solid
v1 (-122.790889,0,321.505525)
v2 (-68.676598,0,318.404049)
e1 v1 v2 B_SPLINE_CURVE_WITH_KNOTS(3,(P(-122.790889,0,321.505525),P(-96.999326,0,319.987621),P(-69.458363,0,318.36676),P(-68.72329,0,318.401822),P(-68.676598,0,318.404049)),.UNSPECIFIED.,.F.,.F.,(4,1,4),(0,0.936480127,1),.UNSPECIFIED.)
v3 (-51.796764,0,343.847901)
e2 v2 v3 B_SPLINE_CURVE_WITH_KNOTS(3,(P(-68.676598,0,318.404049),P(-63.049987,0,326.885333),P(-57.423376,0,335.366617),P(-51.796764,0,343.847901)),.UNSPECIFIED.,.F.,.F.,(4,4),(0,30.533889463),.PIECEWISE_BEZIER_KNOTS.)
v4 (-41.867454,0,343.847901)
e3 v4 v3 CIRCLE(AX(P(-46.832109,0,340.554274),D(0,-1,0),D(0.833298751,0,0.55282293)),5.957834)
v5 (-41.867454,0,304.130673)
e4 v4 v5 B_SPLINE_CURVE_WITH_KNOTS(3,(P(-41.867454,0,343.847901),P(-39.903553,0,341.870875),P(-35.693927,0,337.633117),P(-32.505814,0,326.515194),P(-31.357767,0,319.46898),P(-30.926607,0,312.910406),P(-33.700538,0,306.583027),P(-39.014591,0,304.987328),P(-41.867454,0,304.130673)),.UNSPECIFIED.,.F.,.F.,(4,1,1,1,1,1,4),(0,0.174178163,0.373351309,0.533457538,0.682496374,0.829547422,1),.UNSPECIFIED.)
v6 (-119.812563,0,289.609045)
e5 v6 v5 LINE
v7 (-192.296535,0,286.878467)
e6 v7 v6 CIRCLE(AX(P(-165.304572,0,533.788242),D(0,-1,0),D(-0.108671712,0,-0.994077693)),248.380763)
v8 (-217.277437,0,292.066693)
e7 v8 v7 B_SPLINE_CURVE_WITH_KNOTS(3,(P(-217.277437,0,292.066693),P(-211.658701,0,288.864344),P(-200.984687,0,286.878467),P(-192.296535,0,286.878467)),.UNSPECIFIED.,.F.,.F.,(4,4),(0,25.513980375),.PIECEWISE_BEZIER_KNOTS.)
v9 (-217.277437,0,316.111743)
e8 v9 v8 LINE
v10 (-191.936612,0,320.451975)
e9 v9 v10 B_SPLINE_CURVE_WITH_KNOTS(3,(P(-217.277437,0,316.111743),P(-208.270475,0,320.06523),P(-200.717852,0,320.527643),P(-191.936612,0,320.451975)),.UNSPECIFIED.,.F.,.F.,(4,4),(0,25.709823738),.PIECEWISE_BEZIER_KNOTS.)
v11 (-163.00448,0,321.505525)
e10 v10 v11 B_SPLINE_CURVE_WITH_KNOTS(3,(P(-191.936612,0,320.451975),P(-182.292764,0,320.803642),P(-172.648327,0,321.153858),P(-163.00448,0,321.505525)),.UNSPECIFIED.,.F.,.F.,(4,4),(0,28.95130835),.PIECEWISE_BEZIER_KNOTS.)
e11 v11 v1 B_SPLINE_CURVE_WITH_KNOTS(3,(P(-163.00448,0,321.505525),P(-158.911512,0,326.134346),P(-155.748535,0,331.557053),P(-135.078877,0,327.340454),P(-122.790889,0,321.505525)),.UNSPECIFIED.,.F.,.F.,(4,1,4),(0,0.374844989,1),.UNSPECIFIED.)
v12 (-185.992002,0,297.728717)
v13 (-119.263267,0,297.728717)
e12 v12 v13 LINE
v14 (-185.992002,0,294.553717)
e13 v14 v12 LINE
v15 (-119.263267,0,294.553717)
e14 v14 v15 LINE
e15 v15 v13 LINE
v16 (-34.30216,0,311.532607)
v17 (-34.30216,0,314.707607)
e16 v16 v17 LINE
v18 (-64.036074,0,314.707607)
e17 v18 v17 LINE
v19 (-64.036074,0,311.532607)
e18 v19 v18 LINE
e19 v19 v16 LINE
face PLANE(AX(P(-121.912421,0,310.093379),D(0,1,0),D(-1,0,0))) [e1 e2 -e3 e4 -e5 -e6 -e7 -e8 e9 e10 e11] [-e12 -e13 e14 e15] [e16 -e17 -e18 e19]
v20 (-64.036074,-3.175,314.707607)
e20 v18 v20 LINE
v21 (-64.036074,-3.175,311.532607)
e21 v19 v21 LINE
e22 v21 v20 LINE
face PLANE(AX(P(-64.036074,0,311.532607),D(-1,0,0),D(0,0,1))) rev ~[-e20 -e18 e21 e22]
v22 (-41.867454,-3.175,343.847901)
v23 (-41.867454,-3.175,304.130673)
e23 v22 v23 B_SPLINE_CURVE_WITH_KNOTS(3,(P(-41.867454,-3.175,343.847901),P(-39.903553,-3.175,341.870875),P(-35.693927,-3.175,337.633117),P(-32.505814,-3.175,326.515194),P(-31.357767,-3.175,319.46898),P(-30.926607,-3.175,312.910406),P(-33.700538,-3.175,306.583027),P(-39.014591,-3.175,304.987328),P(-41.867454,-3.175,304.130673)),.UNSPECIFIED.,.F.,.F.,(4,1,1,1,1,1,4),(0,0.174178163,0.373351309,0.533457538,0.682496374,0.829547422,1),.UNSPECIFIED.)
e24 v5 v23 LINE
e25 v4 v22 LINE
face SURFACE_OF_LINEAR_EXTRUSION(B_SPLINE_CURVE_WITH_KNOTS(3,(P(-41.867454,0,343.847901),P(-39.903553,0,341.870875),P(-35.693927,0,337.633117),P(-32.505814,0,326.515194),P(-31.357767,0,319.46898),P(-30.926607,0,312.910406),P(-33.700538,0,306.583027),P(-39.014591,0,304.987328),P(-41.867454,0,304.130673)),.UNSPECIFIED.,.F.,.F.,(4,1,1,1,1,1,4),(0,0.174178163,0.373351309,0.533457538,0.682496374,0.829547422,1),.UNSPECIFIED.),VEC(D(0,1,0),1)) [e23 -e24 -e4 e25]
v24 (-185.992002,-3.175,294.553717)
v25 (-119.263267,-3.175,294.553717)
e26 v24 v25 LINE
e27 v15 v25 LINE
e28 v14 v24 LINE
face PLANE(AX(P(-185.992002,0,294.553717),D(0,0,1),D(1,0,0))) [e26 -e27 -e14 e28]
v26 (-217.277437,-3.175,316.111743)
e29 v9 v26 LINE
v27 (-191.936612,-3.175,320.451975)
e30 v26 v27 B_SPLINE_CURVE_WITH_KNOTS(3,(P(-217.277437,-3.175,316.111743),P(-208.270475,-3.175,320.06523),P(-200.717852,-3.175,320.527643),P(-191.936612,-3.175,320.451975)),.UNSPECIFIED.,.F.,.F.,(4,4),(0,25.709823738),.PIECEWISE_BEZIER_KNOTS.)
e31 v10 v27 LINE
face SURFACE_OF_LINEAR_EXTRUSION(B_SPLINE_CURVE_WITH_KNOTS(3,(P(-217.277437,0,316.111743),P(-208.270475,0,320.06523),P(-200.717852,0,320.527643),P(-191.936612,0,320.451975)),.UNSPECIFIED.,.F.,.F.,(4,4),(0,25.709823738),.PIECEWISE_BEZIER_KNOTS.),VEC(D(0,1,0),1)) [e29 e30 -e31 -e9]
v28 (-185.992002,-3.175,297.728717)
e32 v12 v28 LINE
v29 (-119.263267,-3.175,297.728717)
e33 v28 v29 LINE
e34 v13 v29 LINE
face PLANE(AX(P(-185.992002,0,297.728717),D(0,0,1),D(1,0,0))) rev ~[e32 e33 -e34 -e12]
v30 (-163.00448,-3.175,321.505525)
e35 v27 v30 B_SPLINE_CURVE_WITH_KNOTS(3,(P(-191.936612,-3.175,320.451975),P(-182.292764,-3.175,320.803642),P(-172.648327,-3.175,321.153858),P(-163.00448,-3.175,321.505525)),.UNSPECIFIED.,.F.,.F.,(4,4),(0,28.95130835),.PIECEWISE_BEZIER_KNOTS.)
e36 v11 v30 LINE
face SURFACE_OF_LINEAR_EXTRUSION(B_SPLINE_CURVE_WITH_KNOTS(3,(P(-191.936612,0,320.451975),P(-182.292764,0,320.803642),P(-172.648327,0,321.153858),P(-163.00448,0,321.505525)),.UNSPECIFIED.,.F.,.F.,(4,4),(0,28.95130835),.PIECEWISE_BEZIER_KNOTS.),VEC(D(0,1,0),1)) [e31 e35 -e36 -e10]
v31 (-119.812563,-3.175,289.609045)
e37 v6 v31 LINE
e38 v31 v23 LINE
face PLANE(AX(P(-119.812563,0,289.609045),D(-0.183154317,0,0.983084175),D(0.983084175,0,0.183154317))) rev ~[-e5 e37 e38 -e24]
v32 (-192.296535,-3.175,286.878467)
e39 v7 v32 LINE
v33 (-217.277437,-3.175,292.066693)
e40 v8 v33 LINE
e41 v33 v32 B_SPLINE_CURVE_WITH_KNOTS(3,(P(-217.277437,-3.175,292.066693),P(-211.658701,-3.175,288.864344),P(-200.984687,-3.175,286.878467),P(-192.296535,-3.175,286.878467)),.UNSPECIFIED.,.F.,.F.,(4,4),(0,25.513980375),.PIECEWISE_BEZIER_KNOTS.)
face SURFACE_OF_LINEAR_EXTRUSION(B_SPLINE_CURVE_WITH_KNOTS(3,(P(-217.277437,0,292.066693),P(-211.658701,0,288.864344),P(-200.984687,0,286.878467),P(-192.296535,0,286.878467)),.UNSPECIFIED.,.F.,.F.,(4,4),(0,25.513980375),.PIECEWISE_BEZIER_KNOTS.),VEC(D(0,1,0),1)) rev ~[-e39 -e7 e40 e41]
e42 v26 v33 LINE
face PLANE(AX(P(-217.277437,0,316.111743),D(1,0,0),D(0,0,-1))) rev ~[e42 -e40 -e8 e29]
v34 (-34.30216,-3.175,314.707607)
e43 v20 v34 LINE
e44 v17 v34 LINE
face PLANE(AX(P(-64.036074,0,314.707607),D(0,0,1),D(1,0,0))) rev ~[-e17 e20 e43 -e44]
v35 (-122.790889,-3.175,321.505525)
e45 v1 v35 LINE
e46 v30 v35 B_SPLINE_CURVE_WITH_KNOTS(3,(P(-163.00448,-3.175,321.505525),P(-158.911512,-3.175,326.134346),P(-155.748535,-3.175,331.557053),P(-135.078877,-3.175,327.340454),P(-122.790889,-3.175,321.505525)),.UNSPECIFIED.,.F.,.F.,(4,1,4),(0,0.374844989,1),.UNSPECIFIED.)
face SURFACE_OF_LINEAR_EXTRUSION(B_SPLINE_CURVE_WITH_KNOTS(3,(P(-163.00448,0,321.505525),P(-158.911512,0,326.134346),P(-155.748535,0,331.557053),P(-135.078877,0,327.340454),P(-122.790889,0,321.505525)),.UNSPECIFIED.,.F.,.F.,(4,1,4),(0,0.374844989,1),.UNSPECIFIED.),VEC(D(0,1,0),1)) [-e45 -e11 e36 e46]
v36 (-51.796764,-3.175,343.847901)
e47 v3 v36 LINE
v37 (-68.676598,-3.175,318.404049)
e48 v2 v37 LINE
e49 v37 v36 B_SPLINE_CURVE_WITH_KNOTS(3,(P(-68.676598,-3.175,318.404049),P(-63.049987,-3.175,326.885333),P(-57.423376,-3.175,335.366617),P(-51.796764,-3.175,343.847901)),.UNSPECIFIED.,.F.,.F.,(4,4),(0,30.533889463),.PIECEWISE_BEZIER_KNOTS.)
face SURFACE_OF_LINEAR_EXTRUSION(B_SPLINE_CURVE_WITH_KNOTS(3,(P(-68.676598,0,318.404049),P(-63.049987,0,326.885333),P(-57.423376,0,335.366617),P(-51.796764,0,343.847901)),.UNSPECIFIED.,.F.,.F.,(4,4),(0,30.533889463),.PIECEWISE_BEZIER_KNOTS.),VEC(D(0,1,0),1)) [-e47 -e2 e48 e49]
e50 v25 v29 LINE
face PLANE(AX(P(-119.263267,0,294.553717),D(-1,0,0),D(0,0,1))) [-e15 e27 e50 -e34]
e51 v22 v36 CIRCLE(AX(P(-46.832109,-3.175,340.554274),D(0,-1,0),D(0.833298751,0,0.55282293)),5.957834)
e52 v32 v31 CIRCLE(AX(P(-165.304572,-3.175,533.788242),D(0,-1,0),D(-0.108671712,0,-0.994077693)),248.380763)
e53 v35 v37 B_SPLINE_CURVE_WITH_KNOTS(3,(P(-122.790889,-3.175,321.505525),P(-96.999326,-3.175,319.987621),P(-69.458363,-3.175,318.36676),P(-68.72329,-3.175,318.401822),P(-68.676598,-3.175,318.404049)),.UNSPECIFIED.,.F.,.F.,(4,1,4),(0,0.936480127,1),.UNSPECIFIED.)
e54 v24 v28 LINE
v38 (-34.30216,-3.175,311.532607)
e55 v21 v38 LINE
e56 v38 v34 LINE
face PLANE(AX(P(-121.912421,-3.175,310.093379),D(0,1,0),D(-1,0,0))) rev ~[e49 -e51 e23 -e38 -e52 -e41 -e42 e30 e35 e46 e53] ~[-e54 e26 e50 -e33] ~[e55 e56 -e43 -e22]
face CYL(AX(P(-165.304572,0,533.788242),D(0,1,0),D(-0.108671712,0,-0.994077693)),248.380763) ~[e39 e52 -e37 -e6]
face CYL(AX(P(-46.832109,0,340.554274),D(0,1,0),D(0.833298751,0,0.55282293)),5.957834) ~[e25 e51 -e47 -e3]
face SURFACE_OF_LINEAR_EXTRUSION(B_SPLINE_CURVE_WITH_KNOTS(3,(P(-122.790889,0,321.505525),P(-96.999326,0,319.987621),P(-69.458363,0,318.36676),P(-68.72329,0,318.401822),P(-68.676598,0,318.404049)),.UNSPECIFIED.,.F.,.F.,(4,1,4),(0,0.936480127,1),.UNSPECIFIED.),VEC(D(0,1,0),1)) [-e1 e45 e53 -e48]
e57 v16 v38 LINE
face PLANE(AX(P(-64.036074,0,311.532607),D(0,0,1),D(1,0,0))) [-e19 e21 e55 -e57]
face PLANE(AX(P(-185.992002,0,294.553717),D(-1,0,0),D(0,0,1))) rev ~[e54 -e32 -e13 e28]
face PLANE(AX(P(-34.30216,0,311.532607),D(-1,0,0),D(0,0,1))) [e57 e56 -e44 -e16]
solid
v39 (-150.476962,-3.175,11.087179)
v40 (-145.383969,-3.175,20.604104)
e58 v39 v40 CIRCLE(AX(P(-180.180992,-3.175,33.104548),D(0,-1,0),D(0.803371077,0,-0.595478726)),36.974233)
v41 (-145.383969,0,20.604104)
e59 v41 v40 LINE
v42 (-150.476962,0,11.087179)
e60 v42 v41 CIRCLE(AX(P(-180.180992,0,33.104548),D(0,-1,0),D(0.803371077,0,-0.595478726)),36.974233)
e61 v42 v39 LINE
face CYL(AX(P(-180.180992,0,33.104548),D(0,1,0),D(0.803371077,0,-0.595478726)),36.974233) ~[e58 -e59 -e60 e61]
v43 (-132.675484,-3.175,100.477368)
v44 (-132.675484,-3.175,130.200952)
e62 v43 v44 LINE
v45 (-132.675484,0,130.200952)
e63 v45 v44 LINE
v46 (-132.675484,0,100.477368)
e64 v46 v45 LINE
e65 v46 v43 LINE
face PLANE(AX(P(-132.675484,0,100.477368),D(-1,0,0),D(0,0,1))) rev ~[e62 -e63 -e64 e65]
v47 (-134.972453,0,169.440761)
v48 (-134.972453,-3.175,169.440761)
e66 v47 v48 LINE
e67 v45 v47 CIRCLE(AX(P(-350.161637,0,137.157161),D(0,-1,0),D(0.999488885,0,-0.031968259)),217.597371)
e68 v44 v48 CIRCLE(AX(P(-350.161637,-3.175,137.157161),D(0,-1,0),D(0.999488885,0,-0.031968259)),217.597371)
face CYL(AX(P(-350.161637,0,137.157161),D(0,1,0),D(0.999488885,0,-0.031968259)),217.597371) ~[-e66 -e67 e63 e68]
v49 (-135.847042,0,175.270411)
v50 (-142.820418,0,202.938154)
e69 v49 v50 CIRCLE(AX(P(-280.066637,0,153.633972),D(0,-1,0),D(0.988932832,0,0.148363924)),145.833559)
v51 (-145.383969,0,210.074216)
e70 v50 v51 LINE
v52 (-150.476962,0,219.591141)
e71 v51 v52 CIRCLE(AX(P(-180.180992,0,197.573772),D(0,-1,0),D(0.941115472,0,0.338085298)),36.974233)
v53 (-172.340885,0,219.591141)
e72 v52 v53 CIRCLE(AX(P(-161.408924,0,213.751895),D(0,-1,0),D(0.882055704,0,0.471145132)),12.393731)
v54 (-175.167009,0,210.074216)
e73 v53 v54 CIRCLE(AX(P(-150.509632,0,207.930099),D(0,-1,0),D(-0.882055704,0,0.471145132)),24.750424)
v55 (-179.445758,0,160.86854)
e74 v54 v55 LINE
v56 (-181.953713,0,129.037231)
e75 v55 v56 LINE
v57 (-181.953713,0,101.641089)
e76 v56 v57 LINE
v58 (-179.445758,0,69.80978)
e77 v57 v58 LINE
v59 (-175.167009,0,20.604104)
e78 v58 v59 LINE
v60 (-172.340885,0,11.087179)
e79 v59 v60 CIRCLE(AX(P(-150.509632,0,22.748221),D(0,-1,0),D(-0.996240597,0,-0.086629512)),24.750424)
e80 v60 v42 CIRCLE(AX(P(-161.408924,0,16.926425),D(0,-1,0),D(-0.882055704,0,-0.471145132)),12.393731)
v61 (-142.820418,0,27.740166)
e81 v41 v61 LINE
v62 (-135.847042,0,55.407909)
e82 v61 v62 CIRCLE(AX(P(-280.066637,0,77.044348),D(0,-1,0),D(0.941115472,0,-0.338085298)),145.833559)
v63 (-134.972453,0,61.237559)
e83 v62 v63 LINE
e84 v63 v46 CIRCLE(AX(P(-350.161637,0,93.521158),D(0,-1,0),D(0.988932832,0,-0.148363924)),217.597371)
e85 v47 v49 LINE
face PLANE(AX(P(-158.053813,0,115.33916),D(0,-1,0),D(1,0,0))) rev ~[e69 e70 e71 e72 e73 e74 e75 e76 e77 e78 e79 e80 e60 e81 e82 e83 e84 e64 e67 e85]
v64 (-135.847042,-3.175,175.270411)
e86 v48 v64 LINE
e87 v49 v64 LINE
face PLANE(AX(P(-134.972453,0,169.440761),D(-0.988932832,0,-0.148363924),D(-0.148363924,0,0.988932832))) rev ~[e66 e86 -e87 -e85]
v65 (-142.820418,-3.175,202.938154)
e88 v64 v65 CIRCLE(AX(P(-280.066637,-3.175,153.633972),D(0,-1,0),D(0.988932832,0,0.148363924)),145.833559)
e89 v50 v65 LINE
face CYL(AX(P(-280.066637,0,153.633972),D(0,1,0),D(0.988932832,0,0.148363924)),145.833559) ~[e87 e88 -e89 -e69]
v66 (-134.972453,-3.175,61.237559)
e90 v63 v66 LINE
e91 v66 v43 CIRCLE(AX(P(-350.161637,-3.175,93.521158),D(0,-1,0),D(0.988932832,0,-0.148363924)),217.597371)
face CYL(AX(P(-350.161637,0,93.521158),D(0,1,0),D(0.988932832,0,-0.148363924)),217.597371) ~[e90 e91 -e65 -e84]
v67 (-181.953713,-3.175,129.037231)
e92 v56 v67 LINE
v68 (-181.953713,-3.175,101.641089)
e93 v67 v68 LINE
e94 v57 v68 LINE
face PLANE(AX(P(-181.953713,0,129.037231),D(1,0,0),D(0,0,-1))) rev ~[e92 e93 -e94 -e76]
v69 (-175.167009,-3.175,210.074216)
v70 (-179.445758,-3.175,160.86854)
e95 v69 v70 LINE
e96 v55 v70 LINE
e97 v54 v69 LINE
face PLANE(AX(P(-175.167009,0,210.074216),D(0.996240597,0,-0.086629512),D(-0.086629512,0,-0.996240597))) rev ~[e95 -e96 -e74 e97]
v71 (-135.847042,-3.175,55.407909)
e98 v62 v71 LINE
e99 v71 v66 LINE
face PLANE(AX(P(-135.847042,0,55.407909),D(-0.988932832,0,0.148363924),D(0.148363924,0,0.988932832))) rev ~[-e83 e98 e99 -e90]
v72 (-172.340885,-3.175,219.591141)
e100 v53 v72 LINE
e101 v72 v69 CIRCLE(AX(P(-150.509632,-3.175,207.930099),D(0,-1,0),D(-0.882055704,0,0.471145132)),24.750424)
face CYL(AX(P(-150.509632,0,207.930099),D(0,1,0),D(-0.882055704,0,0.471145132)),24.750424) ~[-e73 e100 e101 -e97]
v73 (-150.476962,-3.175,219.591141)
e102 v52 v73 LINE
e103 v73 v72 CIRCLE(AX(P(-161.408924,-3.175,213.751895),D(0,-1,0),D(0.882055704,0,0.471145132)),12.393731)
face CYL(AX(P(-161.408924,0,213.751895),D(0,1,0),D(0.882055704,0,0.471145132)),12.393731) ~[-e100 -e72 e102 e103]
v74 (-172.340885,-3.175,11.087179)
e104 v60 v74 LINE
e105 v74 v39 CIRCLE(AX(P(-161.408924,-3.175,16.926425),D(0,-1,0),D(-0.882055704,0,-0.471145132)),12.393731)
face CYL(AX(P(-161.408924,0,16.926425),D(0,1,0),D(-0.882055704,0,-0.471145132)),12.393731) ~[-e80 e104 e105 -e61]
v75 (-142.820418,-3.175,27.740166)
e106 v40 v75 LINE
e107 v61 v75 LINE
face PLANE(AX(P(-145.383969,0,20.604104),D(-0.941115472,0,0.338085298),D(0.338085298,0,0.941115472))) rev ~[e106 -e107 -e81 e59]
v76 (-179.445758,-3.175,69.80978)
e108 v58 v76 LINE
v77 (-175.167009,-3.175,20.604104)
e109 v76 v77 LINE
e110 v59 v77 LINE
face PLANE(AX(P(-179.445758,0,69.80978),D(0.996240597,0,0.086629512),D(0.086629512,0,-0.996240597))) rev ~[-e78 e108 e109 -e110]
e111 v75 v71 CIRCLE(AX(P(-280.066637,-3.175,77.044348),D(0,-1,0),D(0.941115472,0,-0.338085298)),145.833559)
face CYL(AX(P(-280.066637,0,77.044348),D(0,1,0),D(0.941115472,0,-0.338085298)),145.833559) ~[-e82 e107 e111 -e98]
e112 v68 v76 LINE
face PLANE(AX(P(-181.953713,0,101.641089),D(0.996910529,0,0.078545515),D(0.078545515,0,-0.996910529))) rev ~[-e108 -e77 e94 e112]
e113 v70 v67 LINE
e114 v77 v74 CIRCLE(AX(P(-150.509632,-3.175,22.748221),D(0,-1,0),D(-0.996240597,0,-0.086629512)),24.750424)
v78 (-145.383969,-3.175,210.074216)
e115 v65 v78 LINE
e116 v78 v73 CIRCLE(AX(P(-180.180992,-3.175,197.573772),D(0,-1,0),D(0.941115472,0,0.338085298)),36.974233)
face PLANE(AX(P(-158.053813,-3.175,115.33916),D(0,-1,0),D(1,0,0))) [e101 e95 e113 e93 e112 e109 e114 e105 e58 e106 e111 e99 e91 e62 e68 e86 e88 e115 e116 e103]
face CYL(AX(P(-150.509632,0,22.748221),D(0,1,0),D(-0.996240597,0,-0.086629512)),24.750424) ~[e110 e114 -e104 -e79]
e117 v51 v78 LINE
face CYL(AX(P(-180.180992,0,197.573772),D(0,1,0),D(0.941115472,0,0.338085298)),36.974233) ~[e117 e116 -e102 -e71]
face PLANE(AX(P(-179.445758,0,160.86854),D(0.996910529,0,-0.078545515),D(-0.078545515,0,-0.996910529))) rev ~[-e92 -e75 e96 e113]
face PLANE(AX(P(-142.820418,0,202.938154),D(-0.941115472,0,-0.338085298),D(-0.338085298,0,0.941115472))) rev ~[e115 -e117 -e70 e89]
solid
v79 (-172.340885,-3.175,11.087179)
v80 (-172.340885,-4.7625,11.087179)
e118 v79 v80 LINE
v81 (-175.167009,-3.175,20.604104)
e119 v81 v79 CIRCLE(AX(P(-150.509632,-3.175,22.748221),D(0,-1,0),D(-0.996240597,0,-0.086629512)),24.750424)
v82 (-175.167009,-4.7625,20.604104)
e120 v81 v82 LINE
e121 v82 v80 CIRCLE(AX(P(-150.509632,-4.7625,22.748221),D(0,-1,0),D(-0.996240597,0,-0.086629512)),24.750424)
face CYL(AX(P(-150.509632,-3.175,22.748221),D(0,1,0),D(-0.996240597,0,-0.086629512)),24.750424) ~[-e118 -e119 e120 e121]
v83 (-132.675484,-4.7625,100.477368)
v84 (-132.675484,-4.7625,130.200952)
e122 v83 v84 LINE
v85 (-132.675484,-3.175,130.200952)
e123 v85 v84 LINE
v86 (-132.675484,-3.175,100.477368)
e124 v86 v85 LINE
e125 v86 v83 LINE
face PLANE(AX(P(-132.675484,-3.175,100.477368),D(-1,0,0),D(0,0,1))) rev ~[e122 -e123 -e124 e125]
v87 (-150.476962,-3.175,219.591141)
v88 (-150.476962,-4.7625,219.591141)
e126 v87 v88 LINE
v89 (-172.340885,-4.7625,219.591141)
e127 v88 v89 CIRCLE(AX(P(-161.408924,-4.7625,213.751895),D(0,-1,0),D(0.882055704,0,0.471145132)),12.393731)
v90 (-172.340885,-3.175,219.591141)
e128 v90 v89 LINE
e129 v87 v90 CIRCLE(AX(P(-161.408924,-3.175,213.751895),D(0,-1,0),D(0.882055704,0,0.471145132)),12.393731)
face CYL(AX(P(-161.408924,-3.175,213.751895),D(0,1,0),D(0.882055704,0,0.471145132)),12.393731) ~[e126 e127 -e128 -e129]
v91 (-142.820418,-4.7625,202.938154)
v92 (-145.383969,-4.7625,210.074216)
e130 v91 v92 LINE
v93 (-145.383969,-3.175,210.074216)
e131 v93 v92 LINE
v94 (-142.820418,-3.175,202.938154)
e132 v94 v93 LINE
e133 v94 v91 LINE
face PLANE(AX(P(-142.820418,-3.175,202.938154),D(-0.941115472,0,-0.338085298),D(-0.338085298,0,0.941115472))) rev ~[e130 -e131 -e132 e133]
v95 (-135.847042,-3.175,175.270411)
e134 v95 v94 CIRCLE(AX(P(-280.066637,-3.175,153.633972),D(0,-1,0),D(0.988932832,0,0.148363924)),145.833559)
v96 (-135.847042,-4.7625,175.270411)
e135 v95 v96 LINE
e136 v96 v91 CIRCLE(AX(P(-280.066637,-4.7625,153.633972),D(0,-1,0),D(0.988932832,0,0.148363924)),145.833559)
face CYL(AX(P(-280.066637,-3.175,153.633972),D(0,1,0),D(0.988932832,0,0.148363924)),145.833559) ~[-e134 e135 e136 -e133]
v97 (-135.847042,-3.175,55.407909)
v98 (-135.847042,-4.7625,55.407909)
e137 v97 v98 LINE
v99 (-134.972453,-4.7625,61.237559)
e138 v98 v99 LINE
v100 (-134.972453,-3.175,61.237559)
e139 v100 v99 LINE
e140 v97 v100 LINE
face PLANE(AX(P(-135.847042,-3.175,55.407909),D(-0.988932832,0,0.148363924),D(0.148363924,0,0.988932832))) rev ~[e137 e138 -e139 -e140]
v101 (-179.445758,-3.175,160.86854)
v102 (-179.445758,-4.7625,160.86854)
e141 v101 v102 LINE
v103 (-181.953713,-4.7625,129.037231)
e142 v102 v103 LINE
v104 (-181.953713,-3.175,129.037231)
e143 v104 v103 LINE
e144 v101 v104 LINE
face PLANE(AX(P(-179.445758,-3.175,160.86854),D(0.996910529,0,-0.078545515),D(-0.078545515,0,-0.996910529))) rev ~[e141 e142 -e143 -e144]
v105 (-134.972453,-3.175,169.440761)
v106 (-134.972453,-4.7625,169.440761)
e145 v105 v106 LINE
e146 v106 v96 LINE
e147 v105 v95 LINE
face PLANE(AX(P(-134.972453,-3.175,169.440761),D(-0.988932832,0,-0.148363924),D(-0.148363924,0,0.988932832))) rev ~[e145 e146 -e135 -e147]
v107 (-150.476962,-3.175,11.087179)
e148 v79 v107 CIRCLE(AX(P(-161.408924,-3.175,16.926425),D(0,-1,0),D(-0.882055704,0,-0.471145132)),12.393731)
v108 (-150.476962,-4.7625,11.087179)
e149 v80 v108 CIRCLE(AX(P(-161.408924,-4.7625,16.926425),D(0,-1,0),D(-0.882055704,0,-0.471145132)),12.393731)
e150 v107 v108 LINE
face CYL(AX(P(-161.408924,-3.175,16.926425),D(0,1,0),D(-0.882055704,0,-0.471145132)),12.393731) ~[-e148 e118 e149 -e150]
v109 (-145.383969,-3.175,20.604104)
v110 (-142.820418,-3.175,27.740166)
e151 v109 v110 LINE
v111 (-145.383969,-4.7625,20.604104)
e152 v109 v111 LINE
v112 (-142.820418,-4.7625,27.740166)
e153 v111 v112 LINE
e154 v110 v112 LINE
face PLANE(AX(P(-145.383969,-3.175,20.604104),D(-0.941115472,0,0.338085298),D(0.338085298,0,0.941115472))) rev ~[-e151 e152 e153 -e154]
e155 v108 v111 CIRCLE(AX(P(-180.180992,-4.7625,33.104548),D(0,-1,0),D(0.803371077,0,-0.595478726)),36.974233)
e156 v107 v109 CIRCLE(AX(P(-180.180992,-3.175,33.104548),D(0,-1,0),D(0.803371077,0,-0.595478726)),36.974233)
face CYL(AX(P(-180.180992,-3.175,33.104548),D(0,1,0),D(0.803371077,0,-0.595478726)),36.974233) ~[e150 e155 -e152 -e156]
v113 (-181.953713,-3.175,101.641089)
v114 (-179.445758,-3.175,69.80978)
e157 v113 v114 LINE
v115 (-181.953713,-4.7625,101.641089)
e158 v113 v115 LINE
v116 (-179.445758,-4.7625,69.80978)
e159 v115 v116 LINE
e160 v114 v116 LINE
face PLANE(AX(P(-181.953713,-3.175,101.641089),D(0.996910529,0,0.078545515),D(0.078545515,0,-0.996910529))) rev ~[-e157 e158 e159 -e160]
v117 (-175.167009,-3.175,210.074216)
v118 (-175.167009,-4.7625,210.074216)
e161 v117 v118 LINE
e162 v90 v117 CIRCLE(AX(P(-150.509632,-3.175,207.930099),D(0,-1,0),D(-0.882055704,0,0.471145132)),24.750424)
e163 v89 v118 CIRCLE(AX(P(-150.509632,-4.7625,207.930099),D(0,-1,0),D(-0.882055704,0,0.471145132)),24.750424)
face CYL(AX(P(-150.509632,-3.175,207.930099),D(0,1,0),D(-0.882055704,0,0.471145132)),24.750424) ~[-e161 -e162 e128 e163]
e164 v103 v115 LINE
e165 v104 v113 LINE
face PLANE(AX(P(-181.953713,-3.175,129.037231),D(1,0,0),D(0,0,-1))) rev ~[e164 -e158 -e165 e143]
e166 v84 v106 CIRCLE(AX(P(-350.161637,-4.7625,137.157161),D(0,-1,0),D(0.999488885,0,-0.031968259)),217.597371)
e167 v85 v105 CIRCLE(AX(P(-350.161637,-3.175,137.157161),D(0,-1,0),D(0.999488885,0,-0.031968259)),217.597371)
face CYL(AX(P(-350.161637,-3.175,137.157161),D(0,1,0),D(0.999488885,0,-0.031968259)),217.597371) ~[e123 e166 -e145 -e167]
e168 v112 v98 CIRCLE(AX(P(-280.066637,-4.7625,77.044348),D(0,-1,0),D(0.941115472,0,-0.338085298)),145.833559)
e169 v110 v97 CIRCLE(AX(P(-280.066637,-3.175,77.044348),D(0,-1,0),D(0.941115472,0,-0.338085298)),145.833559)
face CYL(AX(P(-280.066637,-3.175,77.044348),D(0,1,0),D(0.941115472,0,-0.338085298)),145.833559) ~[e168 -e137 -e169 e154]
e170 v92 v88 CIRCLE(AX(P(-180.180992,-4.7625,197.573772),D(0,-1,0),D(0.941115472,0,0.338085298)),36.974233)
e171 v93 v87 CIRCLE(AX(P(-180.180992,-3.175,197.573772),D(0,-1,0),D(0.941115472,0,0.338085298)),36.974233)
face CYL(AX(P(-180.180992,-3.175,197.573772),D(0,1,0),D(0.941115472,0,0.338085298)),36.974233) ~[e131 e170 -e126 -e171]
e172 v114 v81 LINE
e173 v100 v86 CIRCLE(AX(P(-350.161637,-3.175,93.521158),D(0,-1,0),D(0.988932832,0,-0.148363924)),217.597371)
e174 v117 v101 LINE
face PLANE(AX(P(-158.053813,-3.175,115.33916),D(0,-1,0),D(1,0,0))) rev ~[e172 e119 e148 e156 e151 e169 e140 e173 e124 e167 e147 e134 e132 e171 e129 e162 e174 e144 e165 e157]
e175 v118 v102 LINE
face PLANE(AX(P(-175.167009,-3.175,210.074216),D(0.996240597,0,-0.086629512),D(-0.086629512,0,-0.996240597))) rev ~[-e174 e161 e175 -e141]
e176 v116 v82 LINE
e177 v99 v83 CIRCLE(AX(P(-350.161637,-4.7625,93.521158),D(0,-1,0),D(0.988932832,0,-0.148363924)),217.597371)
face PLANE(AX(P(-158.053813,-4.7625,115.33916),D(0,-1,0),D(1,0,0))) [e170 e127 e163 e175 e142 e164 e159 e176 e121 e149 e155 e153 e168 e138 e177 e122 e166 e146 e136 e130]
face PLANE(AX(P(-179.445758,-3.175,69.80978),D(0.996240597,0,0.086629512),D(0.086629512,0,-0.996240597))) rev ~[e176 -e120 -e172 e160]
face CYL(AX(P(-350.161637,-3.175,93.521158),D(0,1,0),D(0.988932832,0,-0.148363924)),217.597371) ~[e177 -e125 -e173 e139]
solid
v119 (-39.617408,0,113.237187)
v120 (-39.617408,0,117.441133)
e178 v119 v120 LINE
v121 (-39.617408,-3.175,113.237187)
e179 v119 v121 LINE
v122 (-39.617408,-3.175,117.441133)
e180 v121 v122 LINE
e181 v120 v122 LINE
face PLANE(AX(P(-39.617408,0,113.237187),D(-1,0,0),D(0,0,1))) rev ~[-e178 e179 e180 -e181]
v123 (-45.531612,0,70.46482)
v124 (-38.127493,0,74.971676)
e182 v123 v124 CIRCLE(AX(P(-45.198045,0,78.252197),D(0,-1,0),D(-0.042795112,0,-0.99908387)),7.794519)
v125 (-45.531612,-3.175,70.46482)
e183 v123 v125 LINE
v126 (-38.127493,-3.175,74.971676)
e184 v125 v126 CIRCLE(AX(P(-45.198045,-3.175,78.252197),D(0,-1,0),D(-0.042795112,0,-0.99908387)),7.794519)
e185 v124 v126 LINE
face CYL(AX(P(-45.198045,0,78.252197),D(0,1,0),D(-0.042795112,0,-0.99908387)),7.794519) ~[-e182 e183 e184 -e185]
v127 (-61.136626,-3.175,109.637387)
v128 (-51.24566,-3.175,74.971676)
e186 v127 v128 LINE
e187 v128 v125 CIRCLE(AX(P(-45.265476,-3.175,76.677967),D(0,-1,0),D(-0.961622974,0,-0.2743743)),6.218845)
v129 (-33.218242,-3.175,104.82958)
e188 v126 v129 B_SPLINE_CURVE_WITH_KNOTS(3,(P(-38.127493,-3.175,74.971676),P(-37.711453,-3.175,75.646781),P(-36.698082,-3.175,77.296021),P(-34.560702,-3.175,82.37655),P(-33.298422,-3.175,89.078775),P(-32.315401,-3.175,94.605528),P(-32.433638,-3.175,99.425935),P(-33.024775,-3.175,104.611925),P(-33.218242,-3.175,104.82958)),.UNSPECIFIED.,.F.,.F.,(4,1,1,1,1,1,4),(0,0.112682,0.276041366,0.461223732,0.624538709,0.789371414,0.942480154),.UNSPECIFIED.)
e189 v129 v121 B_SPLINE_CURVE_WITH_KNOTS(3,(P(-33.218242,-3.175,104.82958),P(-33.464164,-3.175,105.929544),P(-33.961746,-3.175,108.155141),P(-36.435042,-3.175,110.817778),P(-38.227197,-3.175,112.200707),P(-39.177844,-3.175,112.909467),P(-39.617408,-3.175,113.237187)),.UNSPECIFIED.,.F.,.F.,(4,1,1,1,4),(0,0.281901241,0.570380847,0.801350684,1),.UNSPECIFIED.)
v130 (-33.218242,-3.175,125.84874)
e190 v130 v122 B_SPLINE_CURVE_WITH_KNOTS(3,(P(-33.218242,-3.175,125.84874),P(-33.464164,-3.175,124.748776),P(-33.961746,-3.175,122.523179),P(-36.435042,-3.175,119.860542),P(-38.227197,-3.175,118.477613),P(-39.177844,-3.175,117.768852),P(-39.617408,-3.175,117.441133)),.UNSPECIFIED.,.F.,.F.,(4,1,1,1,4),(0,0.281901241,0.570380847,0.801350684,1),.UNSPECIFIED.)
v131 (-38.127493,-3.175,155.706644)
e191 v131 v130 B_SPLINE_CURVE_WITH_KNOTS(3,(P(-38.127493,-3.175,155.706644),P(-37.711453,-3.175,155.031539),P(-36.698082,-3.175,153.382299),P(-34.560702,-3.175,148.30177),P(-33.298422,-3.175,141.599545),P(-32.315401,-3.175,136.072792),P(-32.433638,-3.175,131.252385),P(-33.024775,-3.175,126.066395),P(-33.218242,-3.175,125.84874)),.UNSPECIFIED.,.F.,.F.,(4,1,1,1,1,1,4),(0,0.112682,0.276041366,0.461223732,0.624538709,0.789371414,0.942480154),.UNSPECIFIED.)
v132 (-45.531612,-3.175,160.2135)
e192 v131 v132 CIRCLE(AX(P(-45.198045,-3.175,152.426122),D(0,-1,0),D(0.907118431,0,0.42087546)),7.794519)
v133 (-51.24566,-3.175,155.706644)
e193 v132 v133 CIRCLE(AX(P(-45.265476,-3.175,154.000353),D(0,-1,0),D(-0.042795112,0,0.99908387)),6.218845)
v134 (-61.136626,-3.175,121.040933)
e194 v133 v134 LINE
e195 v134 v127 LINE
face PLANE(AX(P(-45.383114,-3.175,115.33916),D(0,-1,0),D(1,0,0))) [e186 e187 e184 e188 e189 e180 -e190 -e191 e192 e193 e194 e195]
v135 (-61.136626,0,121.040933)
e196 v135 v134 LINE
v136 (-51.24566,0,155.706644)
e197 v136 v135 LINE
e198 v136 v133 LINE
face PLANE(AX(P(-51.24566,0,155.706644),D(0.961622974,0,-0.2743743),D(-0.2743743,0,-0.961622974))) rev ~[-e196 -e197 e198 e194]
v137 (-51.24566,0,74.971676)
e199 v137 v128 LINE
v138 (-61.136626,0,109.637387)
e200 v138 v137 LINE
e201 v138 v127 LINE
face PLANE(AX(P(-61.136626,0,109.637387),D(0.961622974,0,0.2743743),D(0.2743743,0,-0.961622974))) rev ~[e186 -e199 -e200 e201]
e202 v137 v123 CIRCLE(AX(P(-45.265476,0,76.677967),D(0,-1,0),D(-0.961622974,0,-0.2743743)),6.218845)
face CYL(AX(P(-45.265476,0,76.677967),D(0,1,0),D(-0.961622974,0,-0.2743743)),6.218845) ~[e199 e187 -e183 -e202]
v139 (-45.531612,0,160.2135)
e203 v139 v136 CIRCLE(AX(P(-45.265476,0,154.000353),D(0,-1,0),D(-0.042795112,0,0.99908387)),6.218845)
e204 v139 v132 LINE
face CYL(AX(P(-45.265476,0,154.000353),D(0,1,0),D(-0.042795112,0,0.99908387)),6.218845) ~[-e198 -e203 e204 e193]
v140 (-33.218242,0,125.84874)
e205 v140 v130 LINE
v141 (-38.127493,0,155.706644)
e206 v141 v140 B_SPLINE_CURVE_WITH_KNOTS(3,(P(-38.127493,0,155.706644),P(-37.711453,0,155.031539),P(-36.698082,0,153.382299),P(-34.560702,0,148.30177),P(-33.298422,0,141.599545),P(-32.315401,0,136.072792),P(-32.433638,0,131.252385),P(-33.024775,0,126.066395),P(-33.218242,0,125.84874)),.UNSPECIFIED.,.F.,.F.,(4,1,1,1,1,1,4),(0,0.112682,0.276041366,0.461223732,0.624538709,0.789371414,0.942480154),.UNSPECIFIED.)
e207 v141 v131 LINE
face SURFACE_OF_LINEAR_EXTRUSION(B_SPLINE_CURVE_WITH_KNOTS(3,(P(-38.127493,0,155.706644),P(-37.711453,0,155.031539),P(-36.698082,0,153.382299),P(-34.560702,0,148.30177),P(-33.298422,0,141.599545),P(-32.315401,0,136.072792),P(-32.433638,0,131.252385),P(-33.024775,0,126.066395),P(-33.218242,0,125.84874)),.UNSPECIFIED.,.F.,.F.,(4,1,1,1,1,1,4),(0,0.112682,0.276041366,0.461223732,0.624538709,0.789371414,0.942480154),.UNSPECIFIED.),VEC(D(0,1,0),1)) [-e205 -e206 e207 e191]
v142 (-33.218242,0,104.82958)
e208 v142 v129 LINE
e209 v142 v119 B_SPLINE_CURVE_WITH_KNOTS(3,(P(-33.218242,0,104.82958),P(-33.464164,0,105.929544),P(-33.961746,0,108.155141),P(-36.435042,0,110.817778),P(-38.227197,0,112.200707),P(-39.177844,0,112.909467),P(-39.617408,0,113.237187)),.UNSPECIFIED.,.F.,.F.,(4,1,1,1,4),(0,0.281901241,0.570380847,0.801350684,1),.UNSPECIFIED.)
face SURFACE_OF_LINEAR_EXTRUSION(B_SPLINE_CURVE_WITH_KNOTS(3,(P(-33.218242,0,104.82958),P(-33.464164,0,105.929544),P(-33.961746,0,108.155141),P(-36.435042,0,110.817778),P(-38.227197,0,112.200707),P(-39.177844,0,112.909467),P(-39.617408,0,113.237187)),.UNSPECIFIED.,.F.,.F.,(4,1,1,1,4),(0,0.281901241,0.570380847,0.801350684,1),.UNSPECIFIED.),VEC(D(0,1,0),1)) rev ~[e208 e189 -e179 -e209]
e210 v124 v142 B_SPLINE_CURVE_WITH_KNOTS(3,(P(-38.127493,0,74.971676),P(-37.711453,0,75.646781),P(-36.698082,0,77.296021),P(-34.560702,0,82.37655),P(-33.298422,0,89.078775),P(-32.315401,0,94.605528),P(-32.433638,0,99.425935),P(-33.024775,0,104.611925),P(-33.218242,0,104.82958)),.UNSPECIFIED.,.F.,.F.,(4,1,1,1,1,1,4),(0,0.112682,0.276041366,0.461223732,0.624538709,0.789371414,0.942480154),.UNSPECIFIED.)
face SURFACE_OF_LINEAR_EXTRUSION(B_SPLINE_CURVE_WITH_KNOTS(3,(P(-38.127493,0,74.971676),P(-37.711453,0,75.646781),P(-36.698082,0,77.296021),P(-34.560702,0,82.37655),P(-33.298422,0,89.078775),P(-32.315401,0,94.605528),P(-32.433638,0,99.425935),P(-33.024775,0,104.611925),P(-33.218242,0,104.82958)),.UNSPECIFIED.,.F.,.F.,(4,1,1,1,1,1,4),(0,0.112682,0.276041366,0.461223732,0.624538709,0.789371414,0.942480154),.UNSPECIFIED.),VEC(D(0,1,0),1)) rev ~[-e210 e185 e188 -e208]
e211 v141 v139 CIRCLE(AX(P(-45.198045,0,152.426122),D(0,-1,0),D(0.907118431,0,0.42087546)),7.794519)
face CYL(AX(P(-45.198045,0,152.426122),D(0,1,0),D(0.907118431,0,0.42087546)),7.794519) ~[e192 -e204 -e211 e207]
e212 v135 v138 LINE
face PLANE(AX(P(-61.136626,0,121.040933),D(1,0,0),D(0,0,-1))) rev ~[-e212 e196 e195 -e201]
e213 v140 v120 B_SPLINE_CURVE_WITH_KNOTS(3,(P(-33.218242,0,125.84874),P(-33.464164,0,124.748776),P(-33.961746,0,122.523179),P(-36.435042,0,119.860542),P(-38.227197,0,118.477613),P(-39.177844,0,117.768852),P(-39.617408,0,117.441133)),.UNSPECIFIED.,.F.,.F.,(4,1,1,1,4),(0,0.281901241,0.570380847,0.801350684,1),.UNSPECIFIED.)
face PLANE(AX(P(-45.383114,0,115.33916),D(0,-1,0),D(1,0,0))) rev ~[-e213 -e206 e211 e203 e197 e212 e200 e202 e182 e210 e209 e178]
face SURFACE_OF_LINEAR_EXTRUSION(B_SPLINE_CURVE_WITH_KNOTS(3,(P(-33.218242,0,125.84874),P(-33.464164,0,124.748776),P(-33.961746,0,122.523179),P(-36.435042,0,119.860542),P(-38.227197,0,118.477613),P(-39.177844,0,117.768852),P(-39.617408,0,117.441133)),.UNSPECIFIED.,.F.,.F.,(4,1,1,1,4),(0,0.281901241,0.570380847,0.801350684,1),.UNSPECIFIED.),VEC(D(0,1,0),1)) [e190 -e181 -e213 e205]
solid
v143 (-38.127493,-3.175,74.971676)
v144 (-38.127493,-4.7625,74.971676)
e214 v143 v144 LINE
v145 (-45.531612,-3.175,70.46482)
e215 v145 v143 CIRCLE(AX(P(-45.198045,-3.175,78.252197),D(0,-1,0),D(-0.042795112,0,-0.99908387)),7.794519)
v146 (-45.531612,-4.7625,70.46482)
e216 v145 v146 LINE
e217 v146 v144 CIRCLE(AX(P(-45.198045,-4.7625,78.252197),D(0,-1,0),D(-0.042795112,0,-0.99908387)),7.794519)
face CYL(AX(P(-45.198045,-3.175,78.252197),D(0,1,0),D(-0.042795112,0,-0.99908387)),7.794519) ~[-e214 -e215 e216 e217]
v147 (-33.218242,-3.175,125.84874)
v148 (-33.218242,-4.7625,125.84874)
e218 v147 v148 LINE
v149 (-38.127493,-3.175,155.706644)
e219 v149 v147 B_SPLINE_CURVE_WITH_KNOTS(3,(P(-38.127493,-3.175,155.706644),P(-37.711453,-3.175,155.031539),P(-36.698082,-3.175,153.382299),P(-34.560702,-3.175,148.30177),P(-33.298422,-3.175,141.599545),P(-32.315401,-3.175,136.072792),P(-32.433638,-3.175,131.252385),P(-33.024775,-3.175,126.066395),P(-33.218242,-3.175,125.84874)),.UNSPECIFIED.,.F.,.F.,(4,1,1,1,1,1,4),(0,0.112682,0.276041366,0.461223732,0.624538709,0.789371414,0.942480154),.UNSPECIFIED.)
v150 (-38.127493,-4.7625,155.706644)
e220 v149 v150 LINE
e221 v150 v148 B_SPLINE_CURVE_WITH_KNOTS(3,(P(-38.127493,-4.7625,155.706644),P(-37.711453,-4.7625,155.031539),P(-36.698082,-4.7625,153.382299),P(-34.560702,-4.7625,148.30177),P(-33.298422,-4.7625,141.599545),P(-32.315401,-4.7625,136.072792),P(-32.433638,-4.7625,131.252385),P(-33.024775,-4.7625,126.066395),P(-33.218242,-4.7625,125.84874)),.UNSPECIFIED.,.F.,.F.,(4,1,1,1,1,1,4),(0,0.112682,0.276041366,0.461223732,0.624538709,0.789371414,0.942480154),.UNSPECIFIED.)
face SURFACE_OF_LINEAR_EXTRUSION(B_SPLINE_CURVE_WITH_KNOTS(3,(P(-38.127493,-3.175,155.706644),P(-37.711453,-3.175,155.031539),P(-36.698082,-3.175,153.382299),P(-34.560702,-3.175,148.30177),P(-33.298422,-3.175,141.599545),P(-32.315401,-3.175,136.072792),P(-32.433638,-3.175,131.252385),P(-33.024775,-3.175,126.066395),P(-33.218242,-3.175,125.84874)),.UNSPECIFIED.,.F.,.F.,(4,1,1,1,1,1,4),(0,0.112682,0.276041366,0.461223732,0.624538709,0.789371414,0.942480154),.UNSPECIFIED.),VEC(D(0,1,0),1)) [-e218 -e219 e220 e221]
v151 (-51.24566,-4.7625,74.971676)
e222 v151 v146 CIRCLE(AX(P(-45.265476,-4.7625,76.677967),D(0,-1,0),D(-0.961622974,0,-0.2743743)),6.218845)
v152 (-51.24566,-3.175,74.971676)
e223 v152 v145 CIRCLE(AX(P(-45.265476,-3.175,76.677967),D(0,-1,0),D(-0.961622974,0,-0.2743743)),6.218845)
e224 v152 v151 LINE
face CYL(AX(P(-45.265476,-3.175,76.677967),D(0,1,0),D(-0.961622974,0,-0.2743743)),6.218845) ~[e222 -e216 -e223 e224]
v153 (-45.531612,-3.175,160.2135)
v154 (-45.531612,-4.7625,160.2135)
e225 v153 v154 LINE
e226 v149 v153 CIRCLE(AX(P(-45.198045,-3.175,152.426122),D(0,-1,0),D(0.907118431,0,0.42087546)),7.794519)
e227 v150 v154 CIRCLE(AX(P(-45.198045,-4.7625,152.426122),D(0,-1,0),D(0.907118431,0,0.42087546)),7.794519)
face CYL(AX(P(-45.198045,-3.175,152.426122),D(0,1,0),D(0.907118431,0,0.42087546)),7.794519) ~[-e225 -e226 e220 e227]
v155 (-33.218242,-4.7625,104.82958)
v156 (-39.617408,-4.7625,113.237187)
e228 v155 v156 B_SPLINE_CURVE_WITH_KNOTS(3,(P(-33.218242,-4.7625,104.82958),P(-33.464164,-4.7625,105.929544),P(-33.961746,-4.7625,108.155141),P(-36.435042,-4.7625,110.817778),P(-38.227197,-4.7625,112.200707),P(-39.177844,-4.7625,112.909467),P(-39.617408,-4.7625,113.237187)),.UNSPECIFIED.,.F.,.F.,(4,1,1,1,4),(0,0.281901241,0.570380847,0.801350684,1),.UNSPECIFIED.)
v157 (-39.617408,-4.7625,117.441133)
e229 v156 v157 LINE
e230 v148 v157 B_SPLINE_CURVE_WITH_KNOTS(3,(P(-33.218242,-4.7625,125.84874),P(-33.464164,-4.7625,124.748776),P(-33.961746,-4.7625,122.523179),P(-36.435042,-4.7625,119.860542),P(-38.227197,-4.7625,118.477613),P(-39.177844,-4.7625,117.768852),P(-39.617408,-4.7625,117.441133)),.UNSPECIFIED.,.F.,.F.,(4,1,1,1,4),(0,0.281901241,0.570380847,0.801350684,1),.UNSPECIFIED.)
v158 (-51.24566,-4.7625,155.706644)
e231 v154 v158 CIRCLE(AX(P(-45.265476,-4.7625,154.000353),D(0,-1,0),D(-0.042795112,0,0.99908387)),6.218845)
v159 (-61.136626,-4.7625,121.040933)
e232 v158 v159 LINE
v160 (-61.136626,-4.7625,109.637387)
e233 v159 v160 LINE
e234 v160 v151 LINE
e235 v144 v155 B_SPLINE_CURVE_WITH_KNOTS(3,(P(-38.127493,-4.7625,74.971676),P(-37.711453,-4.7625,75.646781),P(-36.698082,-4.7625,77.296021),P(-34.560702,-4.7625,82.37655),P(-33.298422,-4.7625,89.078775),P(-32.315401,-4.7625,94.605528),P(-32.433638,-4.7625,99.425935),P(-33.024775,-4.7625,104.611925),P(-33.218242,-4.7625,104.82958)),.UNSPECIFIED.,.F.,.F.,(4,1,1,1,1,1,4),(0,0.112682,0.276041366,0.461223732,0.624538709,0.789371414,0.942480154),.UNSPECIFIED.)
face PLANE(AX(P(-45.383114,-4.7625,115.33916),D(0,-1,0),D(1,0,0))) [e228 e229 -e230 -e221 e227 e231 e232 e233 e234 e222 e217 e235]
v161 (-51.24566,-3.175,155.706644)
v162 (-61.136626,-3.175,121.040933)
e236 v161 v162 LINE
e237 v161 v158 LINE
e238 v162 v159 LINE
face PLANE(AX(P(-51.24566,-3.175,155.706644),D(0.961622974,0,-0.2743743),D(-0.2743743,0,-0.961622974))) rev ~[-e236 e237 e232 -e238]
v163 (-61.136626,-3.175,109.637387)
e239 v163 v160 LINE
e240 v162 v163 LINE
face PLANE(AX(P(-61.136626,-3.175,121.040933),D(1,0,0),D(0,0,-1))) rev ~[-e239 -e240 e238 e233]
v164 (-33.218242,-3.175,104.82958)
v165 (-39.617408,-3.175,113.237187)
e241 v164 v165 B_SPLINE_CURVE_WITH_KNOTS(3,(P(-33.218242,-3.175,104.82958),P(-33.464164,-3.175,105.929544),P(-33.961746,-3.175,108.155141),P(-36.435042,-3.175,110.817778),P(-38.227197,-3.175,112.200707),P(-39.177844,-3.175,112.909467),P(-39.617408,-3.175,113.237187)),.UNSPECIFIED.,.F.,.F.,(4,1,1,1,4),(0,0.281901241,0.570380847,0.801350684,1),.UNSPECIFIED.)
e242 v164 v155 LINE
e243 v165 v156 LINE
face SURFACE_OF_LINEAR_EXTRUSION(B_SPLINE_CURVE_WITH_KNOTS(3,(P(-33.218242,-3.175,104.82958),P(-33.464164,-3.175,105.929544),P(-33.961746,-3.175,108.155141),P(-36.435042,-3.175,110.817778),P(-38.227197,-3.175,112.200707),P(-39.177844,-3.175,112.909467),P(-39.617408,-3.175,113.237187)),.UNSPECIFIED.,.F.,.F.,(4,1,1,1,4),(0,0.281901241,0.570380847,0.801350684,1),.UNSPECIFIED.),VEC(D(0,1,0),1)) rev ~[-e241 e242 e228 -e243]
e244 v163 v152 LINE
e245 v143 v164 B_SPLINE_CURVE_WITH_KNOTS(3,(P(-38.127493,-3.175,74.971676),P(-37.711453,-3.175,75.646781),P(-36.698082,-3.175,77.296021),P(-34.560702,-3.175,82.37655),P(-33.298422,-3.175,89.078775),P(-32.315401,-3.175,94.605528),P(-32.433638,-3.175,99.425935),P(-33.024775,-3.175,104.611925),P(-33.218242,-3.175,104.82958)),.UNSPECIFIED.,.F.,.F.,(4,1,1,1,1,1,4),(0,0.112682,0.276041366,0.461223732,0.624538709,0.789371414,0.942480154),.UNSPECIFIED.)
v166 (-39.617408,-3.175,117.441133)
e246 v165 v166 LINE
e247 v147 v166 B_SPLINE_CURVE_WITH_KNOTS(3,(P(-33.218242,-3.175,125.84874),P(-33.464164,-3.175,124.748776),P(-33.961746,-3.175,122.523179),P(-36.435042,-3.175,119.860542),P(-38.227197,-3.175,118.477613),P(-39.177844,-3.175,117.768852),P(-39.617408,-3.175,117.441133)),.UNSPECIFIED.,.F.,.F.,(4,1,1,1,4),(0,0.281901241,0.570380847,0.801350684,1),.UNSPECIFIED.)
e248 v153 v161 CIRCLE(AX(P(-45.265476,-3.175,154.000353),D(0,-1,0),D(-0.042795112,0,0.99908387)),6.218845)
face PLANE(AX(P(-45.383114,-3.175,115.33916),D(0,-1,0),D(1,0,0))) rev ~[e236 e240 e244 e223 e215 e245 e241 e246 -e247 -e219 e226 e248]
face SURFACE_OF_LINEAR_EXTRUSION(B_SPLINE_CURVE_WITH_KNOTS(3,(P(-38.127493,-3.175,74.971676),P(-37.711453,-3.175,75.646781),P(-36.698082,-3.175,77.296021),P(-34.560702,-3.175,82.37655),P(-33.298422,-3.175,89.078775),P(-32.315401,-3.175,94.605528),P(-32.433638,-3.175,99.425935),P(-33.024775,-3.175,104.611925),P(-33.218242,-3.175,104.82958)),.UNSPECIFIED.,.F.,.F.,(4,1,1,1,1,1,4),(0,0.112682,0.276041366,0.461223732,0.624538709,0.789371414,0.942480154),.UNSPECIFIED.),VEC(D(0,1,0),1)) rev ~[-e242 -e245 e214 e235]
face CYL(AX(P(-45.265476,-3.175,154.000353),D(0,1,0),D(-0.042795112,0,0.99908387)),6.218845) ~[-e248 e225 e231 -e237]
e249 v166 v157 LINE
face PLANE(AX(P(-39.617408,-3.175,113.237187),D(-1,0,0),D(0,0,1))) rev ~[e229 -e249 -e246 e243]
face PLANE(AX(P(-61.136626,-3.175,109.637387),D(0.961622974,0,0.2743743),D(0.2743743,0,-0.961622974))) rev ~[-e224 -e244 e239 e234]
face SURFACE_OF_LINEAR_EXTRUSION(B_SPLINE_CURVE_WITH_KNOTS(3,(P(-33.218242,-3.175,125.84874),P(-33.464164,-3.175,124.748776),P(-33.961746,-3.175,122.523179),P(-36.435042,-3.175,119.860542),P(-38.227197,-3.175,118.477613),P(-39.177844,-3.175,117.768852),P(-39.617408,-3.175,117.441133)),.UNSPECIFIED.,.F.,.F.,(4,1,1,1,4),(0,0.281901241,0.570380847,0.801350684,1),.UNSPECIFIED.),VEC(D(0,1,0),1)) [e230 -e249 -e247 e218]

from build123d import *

# Parameters (mm, degrees)
F1_DEPTH = 3.175
F2_W     = 66.7287356216
F2_H     = 3.175
F2_W_2   = 29.7339134365
F3_DEPTH = 3.1760001
F4_DEPTH = 1.5875


# Not quite as in the source:
# - a feature names something its author has since deleted; it is built from what else it names


with BuildPart() as f1:
    # F0 (on Front) → F1 (new body)
    with BuildSketch(Plane.XZ):
        with BuildLine():
            add(Edge.make_bspline(
                [(-217.2774374485, 316.1117434502), (-208.2704752684, 320.0652301311), (-200.7178515196, 320.5276429653), (-191.9366121292, 320.4519748688)],
                knots=[0, 0, 0, 0, 25.7098237378, 25.7098237378, 25.7098237378, 25.7098237378], degree=3))
            Line((-217.2774374485, 316.1117434502), (-217.2774374485, 292.066693306))
            add(Edge.make_bspline(
                [(-217.2774374485, 292.066693306), (-211.6587013006, 288.8643443584), (-200.9846866131, 286.8784666061), (-192.2965347767, 286.8784666061)],
                knots=[0, 0, 0, 0, 25.5139803752, 25.5139803752, 25.5139803752, 25.5139803752], degree=3))
            ThreePointArc((-192.2965347767, 286.8784666061), (-155.9543345014, 285.583535578), (-119.8125630617, 289.6090447903))
            Line((-119.8125630617, 289.6090447903), (-41.8674536049, 304.1306734085))
            add(Edge.make_bspline(
                [(-41.8674536049, 343.847900629), (-39.9035527612, 341.8708754749), (-35.6939266118, 337.6331173347), (-32.5058142024, 326.5151935972), (-31.3577674671, 319.4689798911), (-30.9266074047, 312.9104055483), (-33.7005376, 306.5830268044), (-39.0145912431, 304.9873280743), (-41.8674536049, 304.1306734085)],
                knots=[0, 0, 0, 0, 0.1741781632, 0.3733513087, 0.5334575375, 0.6824963743, 0.8295474219, 1, 1, 1, 1], degree=3))
            ThreePointArc((-41.8674536049, 343.847900629), (-46.8321088701, 346.5121071855), (-51.7967641354, 343.847900629))
            add(Edge.make_bspline(
                [(-68.6765983701, 318.4040486813), (-63.0499869585, 326.8853326639), (-57.4233755469, 335.3666166464), (-51.7967641354, 343.847900629)],
                knots=[0, 0, 0, 0, 30.5338894629, 30.5338894629, 30.5338894629, 30.5338894629], degree=3))
            add(Edge.make_bspline(
                [(-122.7908893077, 321.5055249581), (-96.9993255664, 319.9876210494), (-69.4583634176, 318.3667602704), (-68.7232901316, 318.4018215907), (-68.6765983701, 318.4040486813)],
                knots=[0, 0, 0, 0, 0.9364801274, 1, 1, 1, 1], degree=3))
            add(Edge.make_bspline(
                [(-163.0044796912, 321.5055249581), (-158.9115120044, 326.1343460077), (-155.7485347114, 331.5570526506), (-135.0788772106, 327.3404538631), (-122.7908893077, 321.5055249581)],
                knots=[0, 0, 0, 0, 0.3748449886, 1, 1, 1, 1], degree=3))
            add(Edge.make_bspline(
                [(-191.9366121292, 320.4519748688), (-182.2927643855, 320.8036422729), (-172.6483274348, 321.1538575539), (-163.0044796912, 321.5055249581)],
                knots=[0, 0, 0, 0, 28.9513083505, 28.9513083505, 28.9513083505, 28.9513083505], degree=3))
        make_face()
    extrude(amount=F1_DEPTH)

    # F2 (on Front) → F3 (cut, through all)
    with BuildSketch(Plane.XZ):
        with Locations((-152.6276346764, 296.1412173271)):
            Rectangle(F2_W, F2_H)
        with Locations((-49.1691168621, 313.1201070309)):
            Rectangle(F2_W_2, F2_H)
    extrude(amount=F3_DEPTH, mode=Mode.SUBTRACT)


with BuildPart() as f1b:
    # F0 (on Front) → F1, piece 2 (new body)
    with BuildSketch(Plane.XZ):
        with BuildLine():
            Line((-179.445758462, 160.8685404062), (-181.9537132978, 129.0372312069))
            Line((-181.9537132978, 129.0372312069), (-181.9537132978, 115.3391599655))
            Line((-181.9537132978, 115.3391599655), (-181.9537132978, 101.6410887241))
            Line((-181.9537132978, 101.6410887241), (-179.445758462, 69.8097795248))
            Line((-179.445758462, 69.8097795248), (-175.1670092344, 20.6041038036))
            ThreePointArc((-175.1670092344, 20.6041038036), (-174.2360127213, 15.7024883336), (-172.3408847108, 11.087179184))
            ThreePointArc((-172.3408847108, 11.087179184), (-161.4089235194, 4.5326941653), (-150.476962328, 11.087179184))
            ThreePointArc((-150.476962328, 11.087179184), (-147.5813077332, 15.658789231), (-145.3839689493, 20.6041038036))
            Line((-145.3839689493, 20.6041038036), (-142.820417881, 27.7401655912))
            ThreePointArc((-142.820417881, 27.7401655912), (-138.6554382828, 41.4030806133), (-135.8470420761, 55.4079088057))
            Line((-135.8470420761, 55.4079088057), (-134.9724531174, 61.2375587225))
            ThreePointArc((-134.9724531174, 61.2375587225), (-132.9361148448, 80.8054911513), (-132.6754838228, 100.4773676395))
            Line((-132.6754838228, 100.4773676395), (-132.6754838228, 115.3391599655))
            Line((-132.6754838228, 115.3391599655), (-132.6754838228, 130.2009522915))
            ThreePointArc((-132.6754838228, 130.2009522915), (-132.9361148448, 149.8728287797), (-134.9724531174, 169.4407612085))
            Line((-134.9724531174, 169.4407612085), (-135.8470420761, 175.2704111254))
            ThreePointArc((-135.8470420761, 175.2704111254), (-138.6554382828, 189.2752393178), (-142.820417881, 202.9381543398))
            Line((-142.820417881, 202.9381543398), (-145.3839689493, 210.0742161274))
            ThreePointArc((-145.3839689493, 210.0742161274), (-147.5813077332, 215.0195307001), (-150.476962328, 219.5911407471))
            ThreePointArc((-150.476962328, 219.5911407471), (-161.4089235194, 226.1456257657), (-172.3408847108, 219.5911407471))
            ThreePointArc((-172.3408847108, 219.5911407471), (-174.2360127213, 214.9758315974), (-175.1670092344, 210.0742161274))
            Line((-175.1670092344, 210.0742161274), (-179.445758462, 160.8685404062))
        make_face()
    extrude(amount=F1_DEPTH)


with BuildPart() as f1c:
    # F0 (on Front) → F1, piece 3 (new body)
    with BuildSketch(Plane.XZ):
        with BuildLine():
            Line((-61.1366257071, 121.0409328341), (-61.1366257071, 115.3391599655))
            Line((-61.1366257071, 115.3391599655), (-61.1366257071, 109.6373870969))
            Line((-61.1366257071, 109.6373870969), (-51.2456595898, 74.9716758728))
            ThreePointArc((-51.2456595898, 74.9716758728), (-49.1167179542, 71.795143879), (-45.5316118896, 70.4648196697))
            ThreePointArc((-45.5316118896, 70.4648196697), (-41.1453075948, 71.5941314621), (-38.1274931133, 74.9716758728))
            add(Edge.make_bspline(
                [(-38.1274931133, 74.9716758728), (-37.7114533868, 75.6467806233), (-36.6980818799, 77.2960212626), (-34.5607015396, 82.3765499704), (-33.29842215, 89.0787746733), (-32.3154011086, 94.6055276867), (-32.4336381536, 99.4259350363), (-33.0247754512, 104.611924583), (-33.218242228, 104.8295795918)],
                knots=[0, 0, 0, 0, 0.1126820004, 0.2760413664, 0.4612237316, 0.6245387092, 0.789371414, 0.9424801543, 0.9424801543, 0.9424801543, 0.9424801543], degree=3))
            add(Edge.make_bspline(
                [(-33.218242228, 104.8295795918), (-33.4641640419, 105.9295439447), (-33.9617464288, 108.1551410958), (-36.4350424059, 110.8177781387), (-38.2271971963, 112.2007073582), (-39.1778436897, 112.9094674542), (-39.617408067, 113.2371872663)],
                knots=[0, 0, 0, 0, 0.281901241, 0.5703808466, 0.801350684, 1, 1, 1, 1], degree=3))
            Line((-39.617408067, 113.2371872663), (-39.617408067, 115.3391599655))
            Line((-39.617408067, 115.3391599655), (-39.617408067, 117.4411326647))
            add(Edge.make_bspline(
                [(-33.218242228, 125.8487403393), (-33.4641640419, 124.7487759864), (-33.9617464288, 122.5231788353), (-36.4350424059, 119.8605417924), (-38.2271971963, 118.4776125728), (-39.1778436897, 117.7688524769), (-39.617408067, 117.4411326647)],
                knots=[0, 0, 0, 0, 0.281901241, 0.5703808466, 0.801350684, 1, 1, 1, 1], degree=3))
            add(Edge.make_bspline(
                [(-38.1274931133, 155.7066440582), (-37.7114533868, 155.0315393077), (-36.6980818799, 153.3822986684), (-34.5607015396, 148.3017699606), (-33.29842215, 141.5995452578), (-32.3154011086, 136.0727922443), (-32.4336381536, 131.2523848947), (-33.0247754512, 126.066395348), (-33.218242228, 125.8487403393)],
                knots=[0, 0, 0, 0, 0.1126820004, 0.2760413664, 0.4612237316, 0.6245387092, 0.789371414, 0.9424801543, 0.9424801543, 0.9424801543, 0.9424801543], degree=3))
            ThreePointArc((-38.1274931133, 155.7066440582), (-41.1453075948, 159.0841884689), (-45.5316118896, 160.2135002613))
            ThreePointArc((-45.5316118896, 160.2135002613), (-49.1167179542, 158.8831760521), (-51.2456595898, 155.7066440582))
            Line((-51.2456595898, 155.7066440582), (-61.1366257071, 121.0409328341))
        make_face()
    extrude(amount=F1_DEPTH)


with BuildPart() as f4:
    # F4 (new): a face of the model
    f4_faces = [f1b.part.faces().sort_by_distance(p)[0] for p in [
        (-157.6168541364, -3.175, 115.3391599655),
    ]]
    extrude(f4_faces, amount=F4_DEPTH)


with BuildPart() as f4b:
    # F4#2 (new): a face of the model
    f4_2_faces = [f1c.part.faces().sort_by_distance(p)[0] for p in [
        (-45.7775339149, -3.175, 115.3391599655),
    ]]
    extrude(f4_2_faces, amount=F4_DEPTH)


solid = Compound([f1.part, f1b.part, f1c.part, f4.part, f4b.part])
